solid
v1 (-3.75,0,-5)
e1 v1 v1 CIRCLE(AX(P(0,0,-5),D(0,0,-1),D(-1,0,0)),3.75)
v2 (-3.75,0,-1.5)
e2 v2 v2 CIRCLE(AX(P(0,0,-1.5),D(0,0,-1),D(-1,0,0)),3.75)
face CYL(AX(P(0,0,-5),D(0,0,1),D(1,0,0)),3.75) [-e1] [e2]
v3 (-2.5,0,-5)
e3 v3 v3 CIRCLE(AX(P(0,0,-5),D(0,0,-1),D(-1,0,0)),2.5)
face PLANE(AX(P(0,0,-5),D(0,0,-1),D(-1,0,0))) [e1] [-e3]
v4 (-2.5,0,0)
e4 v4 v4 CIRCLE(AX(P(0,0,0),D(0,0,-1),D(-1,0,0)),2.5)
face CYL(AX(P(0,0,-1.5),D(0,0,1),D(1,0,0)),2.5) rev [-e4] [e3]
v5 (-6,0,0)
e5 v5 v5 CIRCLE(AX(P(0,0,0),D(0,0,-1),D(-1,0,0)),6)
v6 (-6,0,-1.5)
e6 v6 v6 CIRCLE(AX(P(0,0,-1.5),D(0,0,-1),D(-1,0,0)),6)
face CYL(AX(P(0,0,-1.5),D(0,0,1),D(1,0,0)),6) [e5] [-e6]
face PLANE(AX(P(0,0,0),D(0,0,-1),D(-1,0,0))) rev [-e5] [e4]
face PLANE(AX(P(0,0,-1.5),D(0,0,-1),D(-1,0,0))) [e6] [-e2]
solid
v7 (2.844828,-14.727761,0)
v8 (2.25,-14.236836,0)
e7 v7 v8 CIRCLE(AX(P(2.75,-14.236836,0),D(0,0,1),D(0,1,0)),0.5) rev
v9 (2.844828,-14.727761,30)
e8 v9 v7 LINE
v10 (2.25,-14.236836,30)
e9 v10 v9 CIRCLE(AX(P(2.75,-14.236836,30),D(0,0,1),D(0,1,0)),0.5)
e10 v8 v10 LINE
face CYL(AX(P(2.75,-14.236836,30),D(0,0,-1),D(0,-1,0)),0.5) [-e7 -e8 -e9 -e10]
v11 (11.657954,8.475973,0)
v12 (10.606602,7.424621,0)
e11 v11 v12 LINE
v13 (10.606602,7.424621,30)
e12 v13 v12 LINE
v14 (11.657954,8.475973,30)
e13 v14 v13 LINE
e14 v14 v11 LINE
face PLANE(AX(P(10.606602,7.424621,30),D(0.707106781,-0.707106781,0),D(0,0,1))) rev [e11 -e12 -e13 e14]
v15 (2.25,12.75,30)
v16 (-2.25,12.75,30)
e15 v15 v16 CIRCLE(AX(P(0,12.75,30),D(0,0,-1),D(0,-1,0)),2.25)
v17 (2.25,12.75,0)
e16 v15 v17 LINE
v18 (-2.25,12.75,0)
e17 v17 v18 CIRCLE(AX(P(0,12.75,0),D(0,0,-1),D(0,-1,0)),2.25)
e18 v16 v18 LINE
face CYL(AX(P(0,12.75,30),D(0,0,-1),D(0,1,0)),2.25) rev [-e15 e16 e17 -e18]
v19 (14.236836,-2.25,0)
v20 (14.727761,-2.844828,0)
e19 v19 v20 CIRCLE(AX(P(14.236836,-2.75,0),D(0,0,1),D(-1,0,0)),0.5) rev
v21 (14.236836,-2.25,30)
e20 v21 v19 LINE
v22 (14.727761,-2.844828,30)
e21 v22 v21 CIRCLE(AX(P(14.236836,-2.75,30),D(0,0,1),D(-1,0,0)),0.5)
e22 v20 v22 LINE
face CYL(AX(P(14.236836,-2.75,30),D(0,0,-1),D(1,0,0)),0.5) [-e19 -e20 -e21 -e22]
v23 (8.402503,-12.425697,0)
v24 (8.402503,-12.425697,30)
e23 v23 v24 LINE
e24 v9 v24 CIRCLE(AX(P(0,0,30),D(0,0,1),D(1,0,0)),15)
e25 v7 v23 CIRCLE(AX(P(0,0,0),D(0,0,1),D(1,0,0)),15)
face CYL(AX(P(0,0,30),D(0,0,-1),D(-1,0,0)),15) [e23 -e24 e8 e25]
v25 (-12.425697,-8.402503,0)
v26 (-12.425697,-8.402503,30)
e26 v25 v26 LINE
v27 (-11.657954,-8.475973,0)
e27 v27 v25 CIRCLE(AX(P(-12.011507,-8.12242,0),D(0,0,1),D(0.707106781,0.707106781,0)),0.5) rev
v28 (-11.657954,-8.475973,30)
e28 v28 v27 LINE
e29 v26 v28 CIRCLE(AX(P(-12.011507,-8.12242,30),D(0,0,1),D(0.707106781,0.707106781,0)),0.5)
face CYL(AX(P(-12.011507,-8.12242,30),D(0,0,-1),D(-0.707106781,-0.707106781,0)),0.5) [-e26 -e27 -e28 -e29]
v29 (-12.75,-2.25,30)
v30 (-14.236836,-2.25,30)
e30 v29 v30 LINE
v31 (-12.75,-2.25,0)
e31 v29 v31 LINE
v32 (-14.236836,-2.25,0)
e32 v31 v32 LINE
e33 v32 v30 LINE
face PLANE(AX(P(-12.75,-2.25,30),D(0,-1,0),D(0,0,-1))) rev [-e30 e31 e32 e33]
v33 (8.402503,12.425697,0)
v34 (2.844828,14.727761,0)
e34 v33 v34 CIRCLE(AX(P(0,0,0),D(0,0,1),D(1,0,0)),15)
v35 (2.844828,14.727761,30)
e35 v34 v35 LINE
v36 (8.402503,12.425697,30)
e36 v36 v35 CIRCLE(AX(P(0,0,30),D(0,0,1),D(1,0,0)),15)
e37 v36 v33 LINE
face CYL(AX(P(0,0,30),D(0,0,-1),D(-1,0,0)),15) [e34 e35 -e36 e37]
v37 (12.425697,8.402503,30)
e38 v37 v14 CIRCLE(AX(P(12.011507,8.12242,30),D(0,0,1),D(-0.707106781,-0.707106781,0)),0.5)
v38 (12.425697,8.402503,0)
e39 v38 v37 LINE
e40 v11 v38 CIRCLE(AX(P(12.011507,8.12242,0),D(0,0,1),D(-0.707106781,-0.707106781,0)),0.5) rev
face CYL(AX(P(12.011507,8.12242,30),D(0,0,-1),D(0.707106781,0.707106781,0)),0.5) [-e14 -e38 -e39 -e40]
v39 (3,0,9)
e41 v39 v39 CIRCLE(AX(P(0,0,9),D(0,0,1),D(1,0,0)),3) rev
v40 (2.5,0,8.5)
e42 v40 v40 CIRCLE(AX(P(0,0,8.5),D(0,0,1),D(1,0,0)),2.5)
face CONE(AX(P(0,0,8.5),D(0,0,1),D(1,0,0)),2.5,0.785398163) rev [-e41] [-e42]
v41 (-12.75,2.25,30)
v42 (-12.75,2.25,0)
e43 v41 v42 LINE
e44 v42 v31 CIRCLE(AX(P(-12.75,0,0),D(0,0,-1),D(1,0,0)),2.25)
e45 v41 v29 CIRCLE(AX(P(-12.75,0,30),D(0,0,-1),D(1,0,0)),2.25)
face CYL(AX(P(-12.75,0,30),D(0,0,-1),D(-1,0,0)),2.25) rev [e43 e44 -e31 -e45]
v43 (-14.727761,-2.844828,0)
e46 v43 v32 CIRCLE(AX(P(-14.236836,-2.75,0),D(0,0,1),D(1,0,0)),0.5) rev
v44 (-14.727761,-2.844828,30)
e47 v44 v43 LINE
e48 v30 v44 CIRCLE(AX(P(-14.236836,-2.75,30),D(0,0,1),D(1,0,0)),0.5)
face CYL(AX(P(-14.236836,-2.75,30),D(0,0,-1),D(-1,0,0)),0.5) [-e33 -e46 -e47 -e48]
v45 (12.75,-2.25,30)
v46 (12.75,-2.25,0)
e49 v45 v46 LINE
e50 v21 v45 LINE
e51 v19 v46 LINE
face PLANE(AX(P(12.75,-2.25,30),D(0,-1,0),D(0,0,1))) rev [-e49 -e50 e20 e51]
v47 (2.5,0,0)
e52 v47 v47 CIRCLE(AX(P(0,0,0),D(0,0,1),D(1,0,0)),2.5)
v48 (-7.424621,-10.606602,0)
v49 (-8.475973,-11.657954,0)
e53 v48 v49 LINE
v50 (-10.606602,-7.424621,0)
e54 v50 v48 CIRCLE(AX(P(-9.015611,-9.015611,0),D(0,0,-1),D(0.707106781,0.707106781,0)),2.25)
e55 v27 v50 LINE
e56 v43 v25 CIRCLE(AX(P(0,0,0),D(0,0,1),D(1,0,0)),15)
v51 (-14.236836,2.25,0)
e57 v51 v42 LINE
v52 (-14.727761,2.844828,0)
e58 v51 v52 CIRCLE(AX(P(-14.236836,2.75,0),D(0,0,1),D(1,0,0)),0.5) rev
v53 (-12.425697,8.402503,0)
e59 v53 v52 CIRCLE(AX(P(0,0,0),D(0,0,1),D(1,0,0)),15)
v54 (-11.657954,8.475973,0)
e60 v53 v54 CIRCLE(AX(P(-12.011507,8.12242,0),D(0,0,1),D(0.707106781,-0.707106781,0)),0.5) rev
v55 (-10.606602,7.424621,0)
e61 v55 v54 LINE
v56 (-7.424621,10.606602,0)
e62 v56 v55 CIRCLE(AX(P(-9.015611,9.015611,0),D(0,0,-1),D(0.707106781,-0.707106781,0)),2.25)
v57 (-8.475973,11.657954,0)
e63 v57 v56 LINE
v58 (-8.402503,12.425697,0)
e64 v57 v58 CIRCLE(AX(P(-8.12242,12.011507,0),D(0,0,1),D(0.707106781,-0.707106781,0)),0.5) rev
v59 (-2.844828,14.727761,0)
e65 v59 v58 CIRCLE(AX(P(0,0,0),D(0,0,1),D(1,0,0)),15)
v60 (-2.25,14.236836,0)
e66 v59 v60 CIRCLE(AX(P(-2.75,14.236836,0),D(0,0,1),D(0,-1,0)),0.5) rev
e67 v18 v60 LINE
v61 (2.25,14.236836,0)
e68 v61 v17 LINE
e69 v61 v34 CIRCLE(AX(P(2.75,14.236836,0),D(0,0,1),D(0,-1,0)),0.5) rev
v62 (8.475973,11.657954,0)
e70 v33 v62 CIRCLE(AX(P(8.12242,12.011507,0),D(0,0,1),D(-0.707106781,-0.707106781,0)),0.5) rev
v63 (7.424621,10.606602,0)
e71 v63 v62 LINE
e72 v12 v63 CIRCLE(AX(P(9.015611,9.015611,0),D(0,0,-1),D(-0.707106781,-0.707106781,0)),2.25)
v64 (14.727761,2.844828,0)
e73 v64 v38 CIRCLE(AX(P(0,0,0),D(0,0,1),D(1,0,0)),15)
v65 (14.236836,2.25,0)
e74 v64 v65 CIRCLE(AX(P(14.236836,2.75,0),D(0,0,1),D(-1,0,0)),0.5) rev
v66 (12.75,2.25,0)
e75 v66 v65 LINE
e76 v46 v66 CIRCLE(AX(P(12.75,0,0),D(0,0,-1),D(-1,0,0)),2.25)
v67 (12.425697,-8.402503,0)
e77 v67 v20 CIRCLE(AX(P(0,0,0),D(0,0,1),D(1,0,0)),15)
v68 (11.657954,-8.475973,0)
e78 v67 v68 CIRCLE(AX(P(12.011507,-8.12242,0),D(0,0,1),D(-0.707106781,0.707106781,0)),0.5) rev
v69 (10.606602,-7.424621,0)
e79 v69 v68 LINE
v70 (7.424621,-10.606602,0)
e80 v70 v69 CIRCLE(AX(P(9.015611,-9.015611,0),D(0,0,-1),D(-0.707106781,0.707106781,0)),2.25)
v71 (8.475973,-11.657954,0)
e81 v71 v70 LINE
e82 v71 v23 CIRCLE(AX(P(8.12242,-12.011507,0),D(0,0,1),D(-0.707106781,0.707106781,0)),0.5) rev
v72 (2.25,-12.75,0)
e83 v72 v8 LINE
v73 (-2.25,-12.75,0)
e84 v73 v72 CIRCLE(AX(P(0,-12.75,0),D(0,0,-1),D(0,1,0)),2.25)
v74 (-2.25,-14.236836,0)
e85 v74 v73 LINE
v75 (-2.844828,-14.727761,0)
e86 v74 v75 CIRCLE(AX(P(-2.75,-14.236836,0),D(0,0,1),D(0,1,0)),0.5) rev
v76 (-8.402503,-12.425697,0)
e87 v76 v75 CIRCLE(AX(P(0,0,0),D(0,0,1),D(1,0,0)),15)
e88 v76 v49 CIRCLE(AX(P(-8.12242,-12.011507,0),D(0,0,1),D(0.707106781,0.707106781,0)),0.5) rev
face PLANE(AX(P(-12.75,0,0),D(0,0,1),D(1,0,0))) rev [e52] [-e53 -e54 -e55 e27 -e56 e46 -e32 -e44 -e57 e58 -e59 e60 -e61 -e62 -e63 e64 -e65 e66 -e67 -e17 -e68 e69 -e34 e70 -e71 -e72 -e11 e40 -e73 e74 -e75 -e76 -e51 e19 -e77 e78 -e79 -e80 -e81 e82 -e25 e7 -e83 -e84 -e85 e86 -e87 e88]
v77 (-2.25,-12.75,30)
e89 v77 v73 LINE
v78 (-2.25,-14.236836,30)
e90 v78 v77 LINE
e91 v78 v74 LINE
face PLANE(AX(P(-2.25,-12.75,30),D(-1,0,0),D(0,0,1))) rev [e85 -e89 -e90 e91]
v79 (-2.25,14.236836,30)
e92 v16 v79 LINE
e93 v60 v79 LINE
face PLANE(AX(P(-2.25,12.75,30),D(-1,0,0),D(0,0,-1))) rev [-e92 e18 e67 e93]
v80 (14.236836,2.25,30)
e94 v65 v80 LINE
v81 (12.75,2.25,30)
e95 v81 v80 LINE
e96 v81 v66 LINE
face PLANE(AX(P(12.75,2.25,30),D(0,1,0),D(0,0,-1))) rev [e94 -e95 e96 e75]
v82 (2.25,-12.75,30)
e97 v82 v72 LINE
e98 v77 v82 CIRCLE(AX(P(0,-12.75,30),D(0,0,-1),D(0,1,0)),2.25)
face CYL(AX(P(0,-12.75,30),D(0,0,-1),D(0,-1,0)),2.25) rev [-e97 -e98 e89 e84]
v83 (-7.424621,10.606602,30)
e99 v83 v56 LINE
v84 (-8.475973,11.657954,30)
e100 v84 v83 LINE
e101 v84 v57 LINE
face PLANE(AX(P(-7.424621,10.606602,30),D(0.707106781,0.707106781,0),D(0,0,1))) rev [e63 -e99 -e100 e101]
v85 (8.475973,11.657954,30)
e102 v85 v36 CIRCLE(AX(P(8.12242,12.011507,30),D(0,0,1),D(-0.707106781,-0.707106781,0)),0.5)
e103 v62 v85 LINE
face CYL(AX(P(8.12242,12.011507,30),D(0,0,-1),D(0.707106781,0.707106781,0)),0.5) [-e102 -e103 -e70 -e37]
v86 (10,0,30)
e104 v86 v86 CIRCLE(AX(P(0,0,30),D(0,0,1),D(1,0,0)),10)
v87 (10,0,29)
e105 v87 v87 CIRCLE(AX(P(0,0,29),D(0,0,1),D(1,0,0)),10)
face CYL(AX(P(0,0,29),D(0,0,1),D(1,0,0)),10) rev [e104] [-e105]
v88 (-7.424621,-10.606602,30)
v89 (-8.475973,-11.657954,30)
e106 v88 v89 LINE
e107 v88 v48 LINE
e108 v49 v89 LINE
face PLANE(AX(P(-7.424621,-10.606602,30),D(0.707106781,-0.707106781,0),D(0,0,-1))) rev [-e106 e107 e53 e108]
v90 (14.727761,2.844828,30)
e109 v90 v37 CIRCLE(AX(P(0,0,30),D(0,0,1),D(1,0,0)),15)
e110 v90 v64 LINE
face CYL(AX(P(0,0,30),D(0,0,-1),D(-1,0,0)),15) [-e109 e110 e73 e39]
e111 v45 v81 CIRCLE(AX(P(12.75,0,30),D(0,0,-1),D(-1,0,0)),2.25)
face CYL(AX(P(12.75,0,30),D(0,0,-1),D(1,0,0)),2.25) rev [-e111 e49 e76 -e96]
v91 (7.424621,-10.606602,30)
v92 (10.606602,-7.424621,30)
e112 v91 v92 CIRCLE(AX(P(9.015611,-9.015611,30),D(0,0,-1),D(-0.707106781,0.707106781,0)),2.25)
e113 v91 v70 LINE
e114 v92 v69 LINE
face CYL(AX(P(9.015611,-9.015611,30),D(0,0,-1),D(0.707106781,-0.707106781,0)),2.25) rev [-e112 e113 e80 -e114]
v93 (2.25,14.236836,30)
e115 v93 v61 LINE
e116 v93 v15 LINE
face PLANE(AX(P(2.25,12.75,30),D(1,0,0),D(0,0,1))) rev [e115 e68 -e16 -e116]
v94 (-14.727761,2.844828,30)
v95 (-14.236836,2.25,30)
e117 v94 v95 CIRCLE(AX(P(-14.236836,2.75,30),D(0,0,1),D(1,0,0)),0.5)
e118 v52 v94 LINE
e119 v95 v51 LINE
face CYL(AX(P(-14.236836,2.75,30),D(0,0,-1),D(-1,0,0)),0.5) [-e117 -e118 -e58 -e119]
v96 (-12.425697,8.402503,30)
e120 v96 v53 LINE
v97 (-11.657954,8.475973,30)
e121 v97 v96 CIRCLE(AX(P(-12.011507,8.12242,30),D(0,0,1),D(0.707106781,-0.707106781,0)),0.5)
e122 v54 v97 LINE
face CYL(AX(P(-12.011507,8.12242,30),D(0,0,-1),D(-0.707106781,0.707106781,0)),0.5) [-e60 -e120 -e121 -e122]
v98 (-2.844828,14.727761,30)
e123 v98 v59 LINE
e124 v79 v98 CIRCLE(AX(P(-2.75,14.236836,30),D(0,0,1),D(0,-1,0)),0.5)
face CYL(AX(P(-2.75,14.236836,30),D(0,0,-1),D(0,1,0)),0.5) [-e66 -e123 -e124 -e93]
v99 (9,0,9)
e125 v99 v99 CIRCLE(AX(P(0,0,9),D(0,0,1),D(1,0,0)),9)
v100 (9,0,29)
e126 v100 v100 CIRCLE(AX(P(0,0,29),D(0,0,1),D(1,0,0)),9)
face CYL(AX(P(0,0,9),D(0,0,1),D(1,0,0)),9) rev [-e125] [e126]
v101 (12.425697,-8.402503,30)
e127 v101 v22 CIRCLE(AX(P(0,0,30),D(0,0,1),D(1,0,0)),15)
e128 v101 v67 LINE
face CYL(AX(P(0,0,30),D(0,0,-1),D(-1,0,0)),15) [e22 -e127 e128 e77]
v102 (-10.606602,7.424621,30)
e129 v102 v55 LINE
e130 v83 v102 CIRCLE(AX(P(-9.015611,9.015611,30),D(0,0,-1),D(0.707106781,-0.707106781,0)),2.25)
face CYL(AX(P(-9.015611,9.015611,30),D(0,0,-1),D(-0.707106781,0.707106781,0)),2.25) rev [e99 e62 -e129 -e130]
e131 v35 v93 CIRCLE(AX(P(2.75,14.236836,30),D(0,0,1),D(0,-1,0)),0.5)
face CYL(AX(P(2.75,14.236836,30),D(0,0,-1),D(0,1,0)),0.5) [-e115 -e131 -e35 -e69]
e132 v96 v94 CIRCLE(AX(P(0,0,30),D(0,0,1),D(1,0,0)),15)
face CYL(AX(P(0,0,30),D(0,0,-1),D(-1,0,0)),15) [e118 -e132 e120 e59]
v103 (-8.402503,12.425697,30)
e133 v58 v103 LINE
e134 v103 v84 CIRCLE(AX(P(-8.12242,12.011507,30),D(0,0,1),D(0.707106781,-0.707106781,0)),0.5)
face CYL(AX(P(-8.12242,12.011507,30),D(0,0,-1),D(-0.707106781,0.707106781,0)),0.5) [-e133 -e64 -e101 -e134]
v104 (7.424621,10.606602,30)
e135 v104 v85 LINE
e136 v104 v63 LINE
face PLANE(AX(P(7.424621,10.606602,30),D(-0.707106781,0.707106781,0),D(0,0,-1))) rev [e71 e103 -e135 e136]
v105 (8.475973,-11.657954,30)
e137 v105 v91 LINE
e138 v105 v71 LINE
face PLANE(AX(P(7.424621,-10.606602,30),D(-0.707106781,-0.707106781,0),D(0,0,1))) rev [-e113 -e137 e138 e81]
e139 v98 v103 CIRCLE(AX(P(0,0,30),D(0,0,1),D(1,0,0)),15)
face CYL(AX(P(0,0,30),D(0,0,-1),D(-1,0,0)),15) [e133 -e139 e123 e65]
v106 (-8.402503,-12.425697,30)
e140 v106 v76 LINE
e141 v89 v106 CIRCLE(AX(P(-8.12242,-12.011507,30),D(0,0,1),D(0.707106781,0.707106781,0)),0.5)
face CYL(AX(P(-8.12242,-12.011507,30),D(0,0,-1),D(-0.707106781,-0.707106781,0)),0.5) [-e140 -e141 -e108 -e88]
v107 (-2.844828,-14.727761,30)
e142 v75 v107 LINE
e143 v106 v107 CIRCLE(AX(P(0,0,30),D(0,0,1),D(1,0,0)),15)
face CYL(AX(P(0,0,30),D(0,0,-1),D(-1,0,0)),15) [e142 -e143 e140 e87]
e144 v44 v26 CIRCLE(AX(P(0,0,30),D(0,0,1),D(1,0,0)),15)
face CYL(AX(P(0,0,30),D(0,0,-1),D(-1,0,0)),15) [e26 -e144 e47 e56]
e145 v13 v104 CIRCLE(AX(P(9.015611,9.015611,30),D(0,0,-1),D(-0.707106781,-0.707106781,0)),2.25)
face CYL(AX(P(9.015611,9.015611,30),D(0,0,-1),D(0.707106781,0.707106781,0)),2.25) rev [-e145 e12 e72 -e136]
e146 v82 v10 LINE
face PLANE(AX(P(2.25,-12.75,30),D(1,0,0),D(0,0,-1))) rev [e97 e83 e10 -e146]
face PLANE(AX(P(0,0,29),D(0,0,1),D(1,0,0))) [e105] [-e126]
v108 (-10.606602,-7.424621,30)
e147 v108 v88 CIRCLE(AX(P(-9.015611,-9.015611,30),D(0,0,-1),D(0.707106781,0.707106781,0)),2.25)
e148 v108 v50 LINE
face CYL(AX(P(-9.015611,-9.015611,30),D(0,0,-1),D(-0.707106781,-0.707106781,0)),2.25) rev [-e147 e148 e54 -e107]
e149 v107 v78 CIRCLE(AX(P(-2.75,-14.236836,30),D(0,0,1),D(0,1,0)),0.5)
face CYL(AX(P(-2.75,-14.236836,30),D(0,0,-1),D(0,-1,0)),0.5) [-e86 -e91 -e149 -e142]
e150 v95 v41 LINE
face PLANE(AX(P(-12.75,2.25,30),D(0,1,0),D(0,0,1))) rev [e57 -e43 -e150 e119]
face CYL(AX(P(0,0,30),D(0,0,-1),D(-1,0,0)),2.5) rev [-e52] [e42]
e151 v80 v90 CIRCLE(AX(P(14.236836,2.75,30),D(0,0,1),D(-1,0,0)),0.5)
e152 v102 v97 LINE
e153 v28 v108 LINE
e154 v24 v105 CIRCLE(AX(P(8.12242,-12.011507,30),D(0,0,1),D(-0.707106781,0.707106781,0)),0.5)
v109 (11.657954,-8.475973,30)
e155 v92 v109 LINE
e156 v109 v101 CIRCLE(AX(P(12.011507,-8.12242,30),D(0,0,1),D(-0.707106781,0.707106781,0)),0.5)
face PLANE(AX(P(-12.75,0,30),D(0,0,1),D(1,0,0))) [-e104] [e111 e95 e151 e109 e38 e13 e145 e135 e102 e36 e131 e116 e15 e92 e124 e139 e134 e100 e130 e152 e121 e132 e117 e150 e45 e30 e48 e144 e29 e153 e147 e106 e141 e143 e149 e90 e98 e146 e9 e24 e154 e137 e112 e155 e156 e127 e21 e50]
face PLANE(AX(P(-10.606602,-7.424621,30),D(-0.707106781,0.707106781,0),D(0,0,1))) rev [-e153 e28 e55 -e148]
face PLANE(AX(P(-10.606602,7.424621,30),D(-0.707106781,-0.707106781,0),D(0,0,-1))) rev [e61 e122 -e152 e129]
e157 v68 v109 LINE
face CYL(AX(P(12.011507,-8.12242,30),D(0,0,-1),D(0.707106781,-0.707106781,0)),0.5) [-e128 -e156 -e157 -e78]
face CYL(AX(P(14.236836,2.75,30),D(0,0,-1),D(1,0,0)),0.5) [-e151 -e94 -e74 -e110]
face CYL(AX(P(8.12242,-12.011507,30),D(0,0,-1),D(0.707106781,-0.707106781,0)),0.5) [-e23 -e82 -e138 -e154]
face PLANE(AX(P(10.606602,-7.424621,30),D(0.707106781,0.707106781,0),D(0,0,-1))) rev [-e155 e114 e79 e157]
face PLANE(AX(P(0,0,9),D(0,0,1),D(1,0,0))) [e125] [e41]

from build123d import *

# Parameters (mm, degrees)
SKETCH_1_R               = 2.5
EXTRUDE_1_DEPTH          = 30
FILLET_1_R               = 0.5
SKETCH_3_R               = 10
CUT_EXTRUDE_1_DEPTH      = 1
SKETCH_4_R               = 9
CUT_EXTRUDE_2_DEPTH      = 20
CHAMFER_1_SIZE           = 0.5
PATTERN_CIRCULAR_3_DEPTH = 30
SKETCH_9_R               = 6
SKETCH_9_R_2             = 2.5
EXTRUDE_3_DEPTH          = 1.5
EXTRUDE_START            = 3.5
SKETCH_10_R              = 3.75
SKETCH_10_R_2            = 2.5
EXTRUDE_4_DEPTH          = 3.5


# Read off the part's stored shape, not the designer's step: 阵列(圆周)3
with BuildPart() as part:
    # 草图1 → 凸台-拉伸1 (new body)
    with BuildSketch(Plane.XY):
        with BuildLine():
            Line((-12.75, 2.25), (-14.83028995, 2.25))
            ThreePointArc((-14.83028995, 2.25), (15, 0), (-14.83028995, -2.25))
            Line((-14.83028995, -2.25), (-12.75, -2.25))
            ThreePointArc((-12.75, -2.25), (-10.5, 0), (-12.75, 2.25))
        make_face()
        Circle(SKETCH_1_R, mode=Mode.SUBTRACT)
    extrude(amount=EXTRUDE_1_DEPTH)

    # 圆角1
    fillet_1_edges = [part.edges().sort_by_distance(p)[0] for p in [
        (-14.83028995, 2.25, 15),
        (-14.83028995, -2.25, 15),
    ]]
    fillet(fillet_1_edges, radius=FILLET_1_R)

    # 草图3 → 切除-拉伸1 (cut)
    with BuildSketch(Plane.XY.offset(30)):
        Circle(SKETCH_3_R)
    extrude(amount=-CUT_EXTRUDE_1_DEPTH, mode=Mode.SUBTRACT)

    # 草图4 → 切除-拉伸2 (cut)
    with BuildSketch(Plane.XY.offset(29)):
        Circle(SKETCH_4_R)
    extrude(amount=-CUT_EXTRUDE_2_DEPTH, mode=Mode.SUBTRACT)

    # 倒角1
    chamfer_1_edges = [part.edges().sort_by_distance(p)[0] for p in [
        (-2.5, 0, 9),
    ]]
    chamfer(chamfer_1_edges, length=CHAMFER_1_SIZE)

    # 阵列(圆周)3 outline → 阵列(圆周)3 (cut)
    with BuildSketch(Plane.XY):
        with BuildLine():
            ThreePointArc((-12.425696839, -8.402503084), (-10.606601718, -10.606601718), (-8.402503084, -12.425696839))
            ThreePointArc((-8.402503084, -12.425696839), (-8.620145822, -12.059137344), (-8.475973038, -11.657953554))
            Line((-8.475973038, -11.657953554), (-7.424621202, -10.606601718))
            ThreePointArc((-7.424621202, -10.606601718), (-7.424621202, -7.424621202), (-10.606601718, -7.424621202))
            Line((-10.606601718, -7.424621202), (-11.657953554, -8.475973038))
            ThreePointArc((-11.657953554, -8.475973038), (-12.059137344, -8.620145822), (-12.425696839, -8.402503084))
        make_face()
        with BuildLine():
            ThreePointArc((-8.475973038, 11.657953554), (-8.620145822, 12.059137344), (-8.402503084, 12.425696839))
            ThreePointArc((-8.402503084, 12.425696839), (-10.606601718, 10.606601718), (-12.425696839, 8.402503084))
            ThreePointArc((-12.425696839, 8.402503084), (-12.059137344, 8.620145822), (-11.657953554, 8.475973038))
            Line((-11.657953554, 8.475973038), (-10.606601718, 7.424621202))
            ThreePointArc((-10.606601718, 7.424621202), (-7.424621202, 7.424621202), (-7.424621202, 10.606601718))
            Line((-7.424621202, 10.606601718), (-8.475973038, 11.657953554))
        make_face()
        with BuildLine():
            ThreePointArc((2.25, 14.236836025), (2.431734225, 14.622461357), (2.844827586, 14.727761405))
            ThreePointArc((2.844827586, 14.727761405), (0, 15), (-2.844827586, 14.727761405))
            ThreePointArc((-2.844827586, 14.727761405), (-2.431734225, 14.622461357), (-2.25, 14.236836025))
            Line((-2.25, 14.236836025), (-2.25, 12.75))
            ThreePointArc((-2.25, 12.75), (0, 10.5), (2.25, 12.75))
            Line((2.25, 12.75), (2.25, 14.236836025))
        make_face()
        with BuildLine():
            ThreePointArc((11.657953554, 8.475973038), (12.059137344, 8.620145822), (12.425696839, 8.402503084))
            ThreePointArc((12.425696839, 8.402503084), (10.606601718, 10.606601718), (8.402503084, 12.425696839))
            ThreePointArc((8.402503084, 12.425696839), (8.620145822, 12.059137344), (8.475973038, 11.657953554))
            Line((8.475973038, 11.657953554), (7.424621202, 10.606601718))
            ThreePointArc((7.424621202, 10.606601718), (7.424621202, 7.424621202), (10.606601718, 7.424621202))
            Line((10.606601718, 7.424621202), (11.657953554, 8.475973038))
        make_face()
        with BuildLine():
            ThreePointArc((14.236836025, -2.25), (14.622461357, -2.431734225), (14.727761405, -2.844827586))
            ThreePointArc((14.727761405, -2.844827586), (15, 0), (14.727761405, 2.844827586))
            ThreePointArc((14.727761405, 2.844827586), (14.622461357, 2.431734225), (14.236836025, 2.25))
            Line((14.236836025, 2.25), (12.75, 2.25))
            ThreePointArc((12.75, 2.25), (10.5, 0), (12.75, -2.25))
            Line((12.75, -2.25), (14.236836025, -2.25))
        make_face()
        with BuildLine():
            ThreePointArc((8.475973038, -11.657953554), (8.620145822, -12.059137344), (8.402503084, -12.425696839))
            ThreePointArc((8.402503084, -12.425696839), (10.606601718, -10.606601718), (12.425696839, -8.402503084))
            ThreePointArc((12.425696839, -8.402503084), (12.059137344, -8.620145822), (11.657953554, -8.475973038))
            Line((11.657953554, -8.475973038), (10.606601718, -7.424621202))
            ThreePointArc((10.606601718, -7.424621202), (7.424621202, -7.424621202), (7.424621202, -10.606601718))
            Line((7.424621202, -10.606601718), (8.475973038, -11.657953554))
        make_face()
        with BuildLine():
            ThreePointArc((-2.25, -14.236836025), (-2.431734225, -14.622461357), (-2.844827586, -14.727761405))
            ThreePointArc((-2.844827586, -14.727761405), (0, -15), (2.844827586, -14.727761405))
            ThreePointArc((2.844827586, -14.727761405), (2.431734225, -14.622461357), (2.25, -14.236836025))
            Line((2.25, -14.236836025), (2.25, -12.75))
            ThreePointArc((2.25, -12.75), (0, -10.5), (-2.25, -12.75))
            Line((-2.25, -12.75), (-2.25, -14.236836025))
        make_face()
    extrude(amount=PATTERN_CIRCULAR_3_DEPTH, mode=Mode.SUBTRACT)


with BuildPart() as body_2:
    # 草图9 → 凸台-拉伸3 (new body)
    with BuildSketch(Plane(origin=(0, 0, 0), x_dir=(-1, 0, 0), z_dir=(0, 0, -1))):
        Circle(SKETCH_9_R)
        Circle(SKETCH_9_R_2, mode=Mode.SUBTRACT)
    extrude(amount=EXTRUDE_3_DEPTH)

    # 草图10 → 凸台-拉伸4 (add)
    with BuildSketch(Plane(origin=(0, 0, -1.5), x_dir=(-1, 0, 0), z_dir=(0, 0, -1)).offset(EXTRUDE_START)):
        Circle(SKETCH_10_R)
        Circle(SKETCH_10_R_2, mode=Mode.SUBTRACT)
    extrude(amount=-EXTRUDE_4_DEPTH)


solid = Compound([part.part, body_2.part])
